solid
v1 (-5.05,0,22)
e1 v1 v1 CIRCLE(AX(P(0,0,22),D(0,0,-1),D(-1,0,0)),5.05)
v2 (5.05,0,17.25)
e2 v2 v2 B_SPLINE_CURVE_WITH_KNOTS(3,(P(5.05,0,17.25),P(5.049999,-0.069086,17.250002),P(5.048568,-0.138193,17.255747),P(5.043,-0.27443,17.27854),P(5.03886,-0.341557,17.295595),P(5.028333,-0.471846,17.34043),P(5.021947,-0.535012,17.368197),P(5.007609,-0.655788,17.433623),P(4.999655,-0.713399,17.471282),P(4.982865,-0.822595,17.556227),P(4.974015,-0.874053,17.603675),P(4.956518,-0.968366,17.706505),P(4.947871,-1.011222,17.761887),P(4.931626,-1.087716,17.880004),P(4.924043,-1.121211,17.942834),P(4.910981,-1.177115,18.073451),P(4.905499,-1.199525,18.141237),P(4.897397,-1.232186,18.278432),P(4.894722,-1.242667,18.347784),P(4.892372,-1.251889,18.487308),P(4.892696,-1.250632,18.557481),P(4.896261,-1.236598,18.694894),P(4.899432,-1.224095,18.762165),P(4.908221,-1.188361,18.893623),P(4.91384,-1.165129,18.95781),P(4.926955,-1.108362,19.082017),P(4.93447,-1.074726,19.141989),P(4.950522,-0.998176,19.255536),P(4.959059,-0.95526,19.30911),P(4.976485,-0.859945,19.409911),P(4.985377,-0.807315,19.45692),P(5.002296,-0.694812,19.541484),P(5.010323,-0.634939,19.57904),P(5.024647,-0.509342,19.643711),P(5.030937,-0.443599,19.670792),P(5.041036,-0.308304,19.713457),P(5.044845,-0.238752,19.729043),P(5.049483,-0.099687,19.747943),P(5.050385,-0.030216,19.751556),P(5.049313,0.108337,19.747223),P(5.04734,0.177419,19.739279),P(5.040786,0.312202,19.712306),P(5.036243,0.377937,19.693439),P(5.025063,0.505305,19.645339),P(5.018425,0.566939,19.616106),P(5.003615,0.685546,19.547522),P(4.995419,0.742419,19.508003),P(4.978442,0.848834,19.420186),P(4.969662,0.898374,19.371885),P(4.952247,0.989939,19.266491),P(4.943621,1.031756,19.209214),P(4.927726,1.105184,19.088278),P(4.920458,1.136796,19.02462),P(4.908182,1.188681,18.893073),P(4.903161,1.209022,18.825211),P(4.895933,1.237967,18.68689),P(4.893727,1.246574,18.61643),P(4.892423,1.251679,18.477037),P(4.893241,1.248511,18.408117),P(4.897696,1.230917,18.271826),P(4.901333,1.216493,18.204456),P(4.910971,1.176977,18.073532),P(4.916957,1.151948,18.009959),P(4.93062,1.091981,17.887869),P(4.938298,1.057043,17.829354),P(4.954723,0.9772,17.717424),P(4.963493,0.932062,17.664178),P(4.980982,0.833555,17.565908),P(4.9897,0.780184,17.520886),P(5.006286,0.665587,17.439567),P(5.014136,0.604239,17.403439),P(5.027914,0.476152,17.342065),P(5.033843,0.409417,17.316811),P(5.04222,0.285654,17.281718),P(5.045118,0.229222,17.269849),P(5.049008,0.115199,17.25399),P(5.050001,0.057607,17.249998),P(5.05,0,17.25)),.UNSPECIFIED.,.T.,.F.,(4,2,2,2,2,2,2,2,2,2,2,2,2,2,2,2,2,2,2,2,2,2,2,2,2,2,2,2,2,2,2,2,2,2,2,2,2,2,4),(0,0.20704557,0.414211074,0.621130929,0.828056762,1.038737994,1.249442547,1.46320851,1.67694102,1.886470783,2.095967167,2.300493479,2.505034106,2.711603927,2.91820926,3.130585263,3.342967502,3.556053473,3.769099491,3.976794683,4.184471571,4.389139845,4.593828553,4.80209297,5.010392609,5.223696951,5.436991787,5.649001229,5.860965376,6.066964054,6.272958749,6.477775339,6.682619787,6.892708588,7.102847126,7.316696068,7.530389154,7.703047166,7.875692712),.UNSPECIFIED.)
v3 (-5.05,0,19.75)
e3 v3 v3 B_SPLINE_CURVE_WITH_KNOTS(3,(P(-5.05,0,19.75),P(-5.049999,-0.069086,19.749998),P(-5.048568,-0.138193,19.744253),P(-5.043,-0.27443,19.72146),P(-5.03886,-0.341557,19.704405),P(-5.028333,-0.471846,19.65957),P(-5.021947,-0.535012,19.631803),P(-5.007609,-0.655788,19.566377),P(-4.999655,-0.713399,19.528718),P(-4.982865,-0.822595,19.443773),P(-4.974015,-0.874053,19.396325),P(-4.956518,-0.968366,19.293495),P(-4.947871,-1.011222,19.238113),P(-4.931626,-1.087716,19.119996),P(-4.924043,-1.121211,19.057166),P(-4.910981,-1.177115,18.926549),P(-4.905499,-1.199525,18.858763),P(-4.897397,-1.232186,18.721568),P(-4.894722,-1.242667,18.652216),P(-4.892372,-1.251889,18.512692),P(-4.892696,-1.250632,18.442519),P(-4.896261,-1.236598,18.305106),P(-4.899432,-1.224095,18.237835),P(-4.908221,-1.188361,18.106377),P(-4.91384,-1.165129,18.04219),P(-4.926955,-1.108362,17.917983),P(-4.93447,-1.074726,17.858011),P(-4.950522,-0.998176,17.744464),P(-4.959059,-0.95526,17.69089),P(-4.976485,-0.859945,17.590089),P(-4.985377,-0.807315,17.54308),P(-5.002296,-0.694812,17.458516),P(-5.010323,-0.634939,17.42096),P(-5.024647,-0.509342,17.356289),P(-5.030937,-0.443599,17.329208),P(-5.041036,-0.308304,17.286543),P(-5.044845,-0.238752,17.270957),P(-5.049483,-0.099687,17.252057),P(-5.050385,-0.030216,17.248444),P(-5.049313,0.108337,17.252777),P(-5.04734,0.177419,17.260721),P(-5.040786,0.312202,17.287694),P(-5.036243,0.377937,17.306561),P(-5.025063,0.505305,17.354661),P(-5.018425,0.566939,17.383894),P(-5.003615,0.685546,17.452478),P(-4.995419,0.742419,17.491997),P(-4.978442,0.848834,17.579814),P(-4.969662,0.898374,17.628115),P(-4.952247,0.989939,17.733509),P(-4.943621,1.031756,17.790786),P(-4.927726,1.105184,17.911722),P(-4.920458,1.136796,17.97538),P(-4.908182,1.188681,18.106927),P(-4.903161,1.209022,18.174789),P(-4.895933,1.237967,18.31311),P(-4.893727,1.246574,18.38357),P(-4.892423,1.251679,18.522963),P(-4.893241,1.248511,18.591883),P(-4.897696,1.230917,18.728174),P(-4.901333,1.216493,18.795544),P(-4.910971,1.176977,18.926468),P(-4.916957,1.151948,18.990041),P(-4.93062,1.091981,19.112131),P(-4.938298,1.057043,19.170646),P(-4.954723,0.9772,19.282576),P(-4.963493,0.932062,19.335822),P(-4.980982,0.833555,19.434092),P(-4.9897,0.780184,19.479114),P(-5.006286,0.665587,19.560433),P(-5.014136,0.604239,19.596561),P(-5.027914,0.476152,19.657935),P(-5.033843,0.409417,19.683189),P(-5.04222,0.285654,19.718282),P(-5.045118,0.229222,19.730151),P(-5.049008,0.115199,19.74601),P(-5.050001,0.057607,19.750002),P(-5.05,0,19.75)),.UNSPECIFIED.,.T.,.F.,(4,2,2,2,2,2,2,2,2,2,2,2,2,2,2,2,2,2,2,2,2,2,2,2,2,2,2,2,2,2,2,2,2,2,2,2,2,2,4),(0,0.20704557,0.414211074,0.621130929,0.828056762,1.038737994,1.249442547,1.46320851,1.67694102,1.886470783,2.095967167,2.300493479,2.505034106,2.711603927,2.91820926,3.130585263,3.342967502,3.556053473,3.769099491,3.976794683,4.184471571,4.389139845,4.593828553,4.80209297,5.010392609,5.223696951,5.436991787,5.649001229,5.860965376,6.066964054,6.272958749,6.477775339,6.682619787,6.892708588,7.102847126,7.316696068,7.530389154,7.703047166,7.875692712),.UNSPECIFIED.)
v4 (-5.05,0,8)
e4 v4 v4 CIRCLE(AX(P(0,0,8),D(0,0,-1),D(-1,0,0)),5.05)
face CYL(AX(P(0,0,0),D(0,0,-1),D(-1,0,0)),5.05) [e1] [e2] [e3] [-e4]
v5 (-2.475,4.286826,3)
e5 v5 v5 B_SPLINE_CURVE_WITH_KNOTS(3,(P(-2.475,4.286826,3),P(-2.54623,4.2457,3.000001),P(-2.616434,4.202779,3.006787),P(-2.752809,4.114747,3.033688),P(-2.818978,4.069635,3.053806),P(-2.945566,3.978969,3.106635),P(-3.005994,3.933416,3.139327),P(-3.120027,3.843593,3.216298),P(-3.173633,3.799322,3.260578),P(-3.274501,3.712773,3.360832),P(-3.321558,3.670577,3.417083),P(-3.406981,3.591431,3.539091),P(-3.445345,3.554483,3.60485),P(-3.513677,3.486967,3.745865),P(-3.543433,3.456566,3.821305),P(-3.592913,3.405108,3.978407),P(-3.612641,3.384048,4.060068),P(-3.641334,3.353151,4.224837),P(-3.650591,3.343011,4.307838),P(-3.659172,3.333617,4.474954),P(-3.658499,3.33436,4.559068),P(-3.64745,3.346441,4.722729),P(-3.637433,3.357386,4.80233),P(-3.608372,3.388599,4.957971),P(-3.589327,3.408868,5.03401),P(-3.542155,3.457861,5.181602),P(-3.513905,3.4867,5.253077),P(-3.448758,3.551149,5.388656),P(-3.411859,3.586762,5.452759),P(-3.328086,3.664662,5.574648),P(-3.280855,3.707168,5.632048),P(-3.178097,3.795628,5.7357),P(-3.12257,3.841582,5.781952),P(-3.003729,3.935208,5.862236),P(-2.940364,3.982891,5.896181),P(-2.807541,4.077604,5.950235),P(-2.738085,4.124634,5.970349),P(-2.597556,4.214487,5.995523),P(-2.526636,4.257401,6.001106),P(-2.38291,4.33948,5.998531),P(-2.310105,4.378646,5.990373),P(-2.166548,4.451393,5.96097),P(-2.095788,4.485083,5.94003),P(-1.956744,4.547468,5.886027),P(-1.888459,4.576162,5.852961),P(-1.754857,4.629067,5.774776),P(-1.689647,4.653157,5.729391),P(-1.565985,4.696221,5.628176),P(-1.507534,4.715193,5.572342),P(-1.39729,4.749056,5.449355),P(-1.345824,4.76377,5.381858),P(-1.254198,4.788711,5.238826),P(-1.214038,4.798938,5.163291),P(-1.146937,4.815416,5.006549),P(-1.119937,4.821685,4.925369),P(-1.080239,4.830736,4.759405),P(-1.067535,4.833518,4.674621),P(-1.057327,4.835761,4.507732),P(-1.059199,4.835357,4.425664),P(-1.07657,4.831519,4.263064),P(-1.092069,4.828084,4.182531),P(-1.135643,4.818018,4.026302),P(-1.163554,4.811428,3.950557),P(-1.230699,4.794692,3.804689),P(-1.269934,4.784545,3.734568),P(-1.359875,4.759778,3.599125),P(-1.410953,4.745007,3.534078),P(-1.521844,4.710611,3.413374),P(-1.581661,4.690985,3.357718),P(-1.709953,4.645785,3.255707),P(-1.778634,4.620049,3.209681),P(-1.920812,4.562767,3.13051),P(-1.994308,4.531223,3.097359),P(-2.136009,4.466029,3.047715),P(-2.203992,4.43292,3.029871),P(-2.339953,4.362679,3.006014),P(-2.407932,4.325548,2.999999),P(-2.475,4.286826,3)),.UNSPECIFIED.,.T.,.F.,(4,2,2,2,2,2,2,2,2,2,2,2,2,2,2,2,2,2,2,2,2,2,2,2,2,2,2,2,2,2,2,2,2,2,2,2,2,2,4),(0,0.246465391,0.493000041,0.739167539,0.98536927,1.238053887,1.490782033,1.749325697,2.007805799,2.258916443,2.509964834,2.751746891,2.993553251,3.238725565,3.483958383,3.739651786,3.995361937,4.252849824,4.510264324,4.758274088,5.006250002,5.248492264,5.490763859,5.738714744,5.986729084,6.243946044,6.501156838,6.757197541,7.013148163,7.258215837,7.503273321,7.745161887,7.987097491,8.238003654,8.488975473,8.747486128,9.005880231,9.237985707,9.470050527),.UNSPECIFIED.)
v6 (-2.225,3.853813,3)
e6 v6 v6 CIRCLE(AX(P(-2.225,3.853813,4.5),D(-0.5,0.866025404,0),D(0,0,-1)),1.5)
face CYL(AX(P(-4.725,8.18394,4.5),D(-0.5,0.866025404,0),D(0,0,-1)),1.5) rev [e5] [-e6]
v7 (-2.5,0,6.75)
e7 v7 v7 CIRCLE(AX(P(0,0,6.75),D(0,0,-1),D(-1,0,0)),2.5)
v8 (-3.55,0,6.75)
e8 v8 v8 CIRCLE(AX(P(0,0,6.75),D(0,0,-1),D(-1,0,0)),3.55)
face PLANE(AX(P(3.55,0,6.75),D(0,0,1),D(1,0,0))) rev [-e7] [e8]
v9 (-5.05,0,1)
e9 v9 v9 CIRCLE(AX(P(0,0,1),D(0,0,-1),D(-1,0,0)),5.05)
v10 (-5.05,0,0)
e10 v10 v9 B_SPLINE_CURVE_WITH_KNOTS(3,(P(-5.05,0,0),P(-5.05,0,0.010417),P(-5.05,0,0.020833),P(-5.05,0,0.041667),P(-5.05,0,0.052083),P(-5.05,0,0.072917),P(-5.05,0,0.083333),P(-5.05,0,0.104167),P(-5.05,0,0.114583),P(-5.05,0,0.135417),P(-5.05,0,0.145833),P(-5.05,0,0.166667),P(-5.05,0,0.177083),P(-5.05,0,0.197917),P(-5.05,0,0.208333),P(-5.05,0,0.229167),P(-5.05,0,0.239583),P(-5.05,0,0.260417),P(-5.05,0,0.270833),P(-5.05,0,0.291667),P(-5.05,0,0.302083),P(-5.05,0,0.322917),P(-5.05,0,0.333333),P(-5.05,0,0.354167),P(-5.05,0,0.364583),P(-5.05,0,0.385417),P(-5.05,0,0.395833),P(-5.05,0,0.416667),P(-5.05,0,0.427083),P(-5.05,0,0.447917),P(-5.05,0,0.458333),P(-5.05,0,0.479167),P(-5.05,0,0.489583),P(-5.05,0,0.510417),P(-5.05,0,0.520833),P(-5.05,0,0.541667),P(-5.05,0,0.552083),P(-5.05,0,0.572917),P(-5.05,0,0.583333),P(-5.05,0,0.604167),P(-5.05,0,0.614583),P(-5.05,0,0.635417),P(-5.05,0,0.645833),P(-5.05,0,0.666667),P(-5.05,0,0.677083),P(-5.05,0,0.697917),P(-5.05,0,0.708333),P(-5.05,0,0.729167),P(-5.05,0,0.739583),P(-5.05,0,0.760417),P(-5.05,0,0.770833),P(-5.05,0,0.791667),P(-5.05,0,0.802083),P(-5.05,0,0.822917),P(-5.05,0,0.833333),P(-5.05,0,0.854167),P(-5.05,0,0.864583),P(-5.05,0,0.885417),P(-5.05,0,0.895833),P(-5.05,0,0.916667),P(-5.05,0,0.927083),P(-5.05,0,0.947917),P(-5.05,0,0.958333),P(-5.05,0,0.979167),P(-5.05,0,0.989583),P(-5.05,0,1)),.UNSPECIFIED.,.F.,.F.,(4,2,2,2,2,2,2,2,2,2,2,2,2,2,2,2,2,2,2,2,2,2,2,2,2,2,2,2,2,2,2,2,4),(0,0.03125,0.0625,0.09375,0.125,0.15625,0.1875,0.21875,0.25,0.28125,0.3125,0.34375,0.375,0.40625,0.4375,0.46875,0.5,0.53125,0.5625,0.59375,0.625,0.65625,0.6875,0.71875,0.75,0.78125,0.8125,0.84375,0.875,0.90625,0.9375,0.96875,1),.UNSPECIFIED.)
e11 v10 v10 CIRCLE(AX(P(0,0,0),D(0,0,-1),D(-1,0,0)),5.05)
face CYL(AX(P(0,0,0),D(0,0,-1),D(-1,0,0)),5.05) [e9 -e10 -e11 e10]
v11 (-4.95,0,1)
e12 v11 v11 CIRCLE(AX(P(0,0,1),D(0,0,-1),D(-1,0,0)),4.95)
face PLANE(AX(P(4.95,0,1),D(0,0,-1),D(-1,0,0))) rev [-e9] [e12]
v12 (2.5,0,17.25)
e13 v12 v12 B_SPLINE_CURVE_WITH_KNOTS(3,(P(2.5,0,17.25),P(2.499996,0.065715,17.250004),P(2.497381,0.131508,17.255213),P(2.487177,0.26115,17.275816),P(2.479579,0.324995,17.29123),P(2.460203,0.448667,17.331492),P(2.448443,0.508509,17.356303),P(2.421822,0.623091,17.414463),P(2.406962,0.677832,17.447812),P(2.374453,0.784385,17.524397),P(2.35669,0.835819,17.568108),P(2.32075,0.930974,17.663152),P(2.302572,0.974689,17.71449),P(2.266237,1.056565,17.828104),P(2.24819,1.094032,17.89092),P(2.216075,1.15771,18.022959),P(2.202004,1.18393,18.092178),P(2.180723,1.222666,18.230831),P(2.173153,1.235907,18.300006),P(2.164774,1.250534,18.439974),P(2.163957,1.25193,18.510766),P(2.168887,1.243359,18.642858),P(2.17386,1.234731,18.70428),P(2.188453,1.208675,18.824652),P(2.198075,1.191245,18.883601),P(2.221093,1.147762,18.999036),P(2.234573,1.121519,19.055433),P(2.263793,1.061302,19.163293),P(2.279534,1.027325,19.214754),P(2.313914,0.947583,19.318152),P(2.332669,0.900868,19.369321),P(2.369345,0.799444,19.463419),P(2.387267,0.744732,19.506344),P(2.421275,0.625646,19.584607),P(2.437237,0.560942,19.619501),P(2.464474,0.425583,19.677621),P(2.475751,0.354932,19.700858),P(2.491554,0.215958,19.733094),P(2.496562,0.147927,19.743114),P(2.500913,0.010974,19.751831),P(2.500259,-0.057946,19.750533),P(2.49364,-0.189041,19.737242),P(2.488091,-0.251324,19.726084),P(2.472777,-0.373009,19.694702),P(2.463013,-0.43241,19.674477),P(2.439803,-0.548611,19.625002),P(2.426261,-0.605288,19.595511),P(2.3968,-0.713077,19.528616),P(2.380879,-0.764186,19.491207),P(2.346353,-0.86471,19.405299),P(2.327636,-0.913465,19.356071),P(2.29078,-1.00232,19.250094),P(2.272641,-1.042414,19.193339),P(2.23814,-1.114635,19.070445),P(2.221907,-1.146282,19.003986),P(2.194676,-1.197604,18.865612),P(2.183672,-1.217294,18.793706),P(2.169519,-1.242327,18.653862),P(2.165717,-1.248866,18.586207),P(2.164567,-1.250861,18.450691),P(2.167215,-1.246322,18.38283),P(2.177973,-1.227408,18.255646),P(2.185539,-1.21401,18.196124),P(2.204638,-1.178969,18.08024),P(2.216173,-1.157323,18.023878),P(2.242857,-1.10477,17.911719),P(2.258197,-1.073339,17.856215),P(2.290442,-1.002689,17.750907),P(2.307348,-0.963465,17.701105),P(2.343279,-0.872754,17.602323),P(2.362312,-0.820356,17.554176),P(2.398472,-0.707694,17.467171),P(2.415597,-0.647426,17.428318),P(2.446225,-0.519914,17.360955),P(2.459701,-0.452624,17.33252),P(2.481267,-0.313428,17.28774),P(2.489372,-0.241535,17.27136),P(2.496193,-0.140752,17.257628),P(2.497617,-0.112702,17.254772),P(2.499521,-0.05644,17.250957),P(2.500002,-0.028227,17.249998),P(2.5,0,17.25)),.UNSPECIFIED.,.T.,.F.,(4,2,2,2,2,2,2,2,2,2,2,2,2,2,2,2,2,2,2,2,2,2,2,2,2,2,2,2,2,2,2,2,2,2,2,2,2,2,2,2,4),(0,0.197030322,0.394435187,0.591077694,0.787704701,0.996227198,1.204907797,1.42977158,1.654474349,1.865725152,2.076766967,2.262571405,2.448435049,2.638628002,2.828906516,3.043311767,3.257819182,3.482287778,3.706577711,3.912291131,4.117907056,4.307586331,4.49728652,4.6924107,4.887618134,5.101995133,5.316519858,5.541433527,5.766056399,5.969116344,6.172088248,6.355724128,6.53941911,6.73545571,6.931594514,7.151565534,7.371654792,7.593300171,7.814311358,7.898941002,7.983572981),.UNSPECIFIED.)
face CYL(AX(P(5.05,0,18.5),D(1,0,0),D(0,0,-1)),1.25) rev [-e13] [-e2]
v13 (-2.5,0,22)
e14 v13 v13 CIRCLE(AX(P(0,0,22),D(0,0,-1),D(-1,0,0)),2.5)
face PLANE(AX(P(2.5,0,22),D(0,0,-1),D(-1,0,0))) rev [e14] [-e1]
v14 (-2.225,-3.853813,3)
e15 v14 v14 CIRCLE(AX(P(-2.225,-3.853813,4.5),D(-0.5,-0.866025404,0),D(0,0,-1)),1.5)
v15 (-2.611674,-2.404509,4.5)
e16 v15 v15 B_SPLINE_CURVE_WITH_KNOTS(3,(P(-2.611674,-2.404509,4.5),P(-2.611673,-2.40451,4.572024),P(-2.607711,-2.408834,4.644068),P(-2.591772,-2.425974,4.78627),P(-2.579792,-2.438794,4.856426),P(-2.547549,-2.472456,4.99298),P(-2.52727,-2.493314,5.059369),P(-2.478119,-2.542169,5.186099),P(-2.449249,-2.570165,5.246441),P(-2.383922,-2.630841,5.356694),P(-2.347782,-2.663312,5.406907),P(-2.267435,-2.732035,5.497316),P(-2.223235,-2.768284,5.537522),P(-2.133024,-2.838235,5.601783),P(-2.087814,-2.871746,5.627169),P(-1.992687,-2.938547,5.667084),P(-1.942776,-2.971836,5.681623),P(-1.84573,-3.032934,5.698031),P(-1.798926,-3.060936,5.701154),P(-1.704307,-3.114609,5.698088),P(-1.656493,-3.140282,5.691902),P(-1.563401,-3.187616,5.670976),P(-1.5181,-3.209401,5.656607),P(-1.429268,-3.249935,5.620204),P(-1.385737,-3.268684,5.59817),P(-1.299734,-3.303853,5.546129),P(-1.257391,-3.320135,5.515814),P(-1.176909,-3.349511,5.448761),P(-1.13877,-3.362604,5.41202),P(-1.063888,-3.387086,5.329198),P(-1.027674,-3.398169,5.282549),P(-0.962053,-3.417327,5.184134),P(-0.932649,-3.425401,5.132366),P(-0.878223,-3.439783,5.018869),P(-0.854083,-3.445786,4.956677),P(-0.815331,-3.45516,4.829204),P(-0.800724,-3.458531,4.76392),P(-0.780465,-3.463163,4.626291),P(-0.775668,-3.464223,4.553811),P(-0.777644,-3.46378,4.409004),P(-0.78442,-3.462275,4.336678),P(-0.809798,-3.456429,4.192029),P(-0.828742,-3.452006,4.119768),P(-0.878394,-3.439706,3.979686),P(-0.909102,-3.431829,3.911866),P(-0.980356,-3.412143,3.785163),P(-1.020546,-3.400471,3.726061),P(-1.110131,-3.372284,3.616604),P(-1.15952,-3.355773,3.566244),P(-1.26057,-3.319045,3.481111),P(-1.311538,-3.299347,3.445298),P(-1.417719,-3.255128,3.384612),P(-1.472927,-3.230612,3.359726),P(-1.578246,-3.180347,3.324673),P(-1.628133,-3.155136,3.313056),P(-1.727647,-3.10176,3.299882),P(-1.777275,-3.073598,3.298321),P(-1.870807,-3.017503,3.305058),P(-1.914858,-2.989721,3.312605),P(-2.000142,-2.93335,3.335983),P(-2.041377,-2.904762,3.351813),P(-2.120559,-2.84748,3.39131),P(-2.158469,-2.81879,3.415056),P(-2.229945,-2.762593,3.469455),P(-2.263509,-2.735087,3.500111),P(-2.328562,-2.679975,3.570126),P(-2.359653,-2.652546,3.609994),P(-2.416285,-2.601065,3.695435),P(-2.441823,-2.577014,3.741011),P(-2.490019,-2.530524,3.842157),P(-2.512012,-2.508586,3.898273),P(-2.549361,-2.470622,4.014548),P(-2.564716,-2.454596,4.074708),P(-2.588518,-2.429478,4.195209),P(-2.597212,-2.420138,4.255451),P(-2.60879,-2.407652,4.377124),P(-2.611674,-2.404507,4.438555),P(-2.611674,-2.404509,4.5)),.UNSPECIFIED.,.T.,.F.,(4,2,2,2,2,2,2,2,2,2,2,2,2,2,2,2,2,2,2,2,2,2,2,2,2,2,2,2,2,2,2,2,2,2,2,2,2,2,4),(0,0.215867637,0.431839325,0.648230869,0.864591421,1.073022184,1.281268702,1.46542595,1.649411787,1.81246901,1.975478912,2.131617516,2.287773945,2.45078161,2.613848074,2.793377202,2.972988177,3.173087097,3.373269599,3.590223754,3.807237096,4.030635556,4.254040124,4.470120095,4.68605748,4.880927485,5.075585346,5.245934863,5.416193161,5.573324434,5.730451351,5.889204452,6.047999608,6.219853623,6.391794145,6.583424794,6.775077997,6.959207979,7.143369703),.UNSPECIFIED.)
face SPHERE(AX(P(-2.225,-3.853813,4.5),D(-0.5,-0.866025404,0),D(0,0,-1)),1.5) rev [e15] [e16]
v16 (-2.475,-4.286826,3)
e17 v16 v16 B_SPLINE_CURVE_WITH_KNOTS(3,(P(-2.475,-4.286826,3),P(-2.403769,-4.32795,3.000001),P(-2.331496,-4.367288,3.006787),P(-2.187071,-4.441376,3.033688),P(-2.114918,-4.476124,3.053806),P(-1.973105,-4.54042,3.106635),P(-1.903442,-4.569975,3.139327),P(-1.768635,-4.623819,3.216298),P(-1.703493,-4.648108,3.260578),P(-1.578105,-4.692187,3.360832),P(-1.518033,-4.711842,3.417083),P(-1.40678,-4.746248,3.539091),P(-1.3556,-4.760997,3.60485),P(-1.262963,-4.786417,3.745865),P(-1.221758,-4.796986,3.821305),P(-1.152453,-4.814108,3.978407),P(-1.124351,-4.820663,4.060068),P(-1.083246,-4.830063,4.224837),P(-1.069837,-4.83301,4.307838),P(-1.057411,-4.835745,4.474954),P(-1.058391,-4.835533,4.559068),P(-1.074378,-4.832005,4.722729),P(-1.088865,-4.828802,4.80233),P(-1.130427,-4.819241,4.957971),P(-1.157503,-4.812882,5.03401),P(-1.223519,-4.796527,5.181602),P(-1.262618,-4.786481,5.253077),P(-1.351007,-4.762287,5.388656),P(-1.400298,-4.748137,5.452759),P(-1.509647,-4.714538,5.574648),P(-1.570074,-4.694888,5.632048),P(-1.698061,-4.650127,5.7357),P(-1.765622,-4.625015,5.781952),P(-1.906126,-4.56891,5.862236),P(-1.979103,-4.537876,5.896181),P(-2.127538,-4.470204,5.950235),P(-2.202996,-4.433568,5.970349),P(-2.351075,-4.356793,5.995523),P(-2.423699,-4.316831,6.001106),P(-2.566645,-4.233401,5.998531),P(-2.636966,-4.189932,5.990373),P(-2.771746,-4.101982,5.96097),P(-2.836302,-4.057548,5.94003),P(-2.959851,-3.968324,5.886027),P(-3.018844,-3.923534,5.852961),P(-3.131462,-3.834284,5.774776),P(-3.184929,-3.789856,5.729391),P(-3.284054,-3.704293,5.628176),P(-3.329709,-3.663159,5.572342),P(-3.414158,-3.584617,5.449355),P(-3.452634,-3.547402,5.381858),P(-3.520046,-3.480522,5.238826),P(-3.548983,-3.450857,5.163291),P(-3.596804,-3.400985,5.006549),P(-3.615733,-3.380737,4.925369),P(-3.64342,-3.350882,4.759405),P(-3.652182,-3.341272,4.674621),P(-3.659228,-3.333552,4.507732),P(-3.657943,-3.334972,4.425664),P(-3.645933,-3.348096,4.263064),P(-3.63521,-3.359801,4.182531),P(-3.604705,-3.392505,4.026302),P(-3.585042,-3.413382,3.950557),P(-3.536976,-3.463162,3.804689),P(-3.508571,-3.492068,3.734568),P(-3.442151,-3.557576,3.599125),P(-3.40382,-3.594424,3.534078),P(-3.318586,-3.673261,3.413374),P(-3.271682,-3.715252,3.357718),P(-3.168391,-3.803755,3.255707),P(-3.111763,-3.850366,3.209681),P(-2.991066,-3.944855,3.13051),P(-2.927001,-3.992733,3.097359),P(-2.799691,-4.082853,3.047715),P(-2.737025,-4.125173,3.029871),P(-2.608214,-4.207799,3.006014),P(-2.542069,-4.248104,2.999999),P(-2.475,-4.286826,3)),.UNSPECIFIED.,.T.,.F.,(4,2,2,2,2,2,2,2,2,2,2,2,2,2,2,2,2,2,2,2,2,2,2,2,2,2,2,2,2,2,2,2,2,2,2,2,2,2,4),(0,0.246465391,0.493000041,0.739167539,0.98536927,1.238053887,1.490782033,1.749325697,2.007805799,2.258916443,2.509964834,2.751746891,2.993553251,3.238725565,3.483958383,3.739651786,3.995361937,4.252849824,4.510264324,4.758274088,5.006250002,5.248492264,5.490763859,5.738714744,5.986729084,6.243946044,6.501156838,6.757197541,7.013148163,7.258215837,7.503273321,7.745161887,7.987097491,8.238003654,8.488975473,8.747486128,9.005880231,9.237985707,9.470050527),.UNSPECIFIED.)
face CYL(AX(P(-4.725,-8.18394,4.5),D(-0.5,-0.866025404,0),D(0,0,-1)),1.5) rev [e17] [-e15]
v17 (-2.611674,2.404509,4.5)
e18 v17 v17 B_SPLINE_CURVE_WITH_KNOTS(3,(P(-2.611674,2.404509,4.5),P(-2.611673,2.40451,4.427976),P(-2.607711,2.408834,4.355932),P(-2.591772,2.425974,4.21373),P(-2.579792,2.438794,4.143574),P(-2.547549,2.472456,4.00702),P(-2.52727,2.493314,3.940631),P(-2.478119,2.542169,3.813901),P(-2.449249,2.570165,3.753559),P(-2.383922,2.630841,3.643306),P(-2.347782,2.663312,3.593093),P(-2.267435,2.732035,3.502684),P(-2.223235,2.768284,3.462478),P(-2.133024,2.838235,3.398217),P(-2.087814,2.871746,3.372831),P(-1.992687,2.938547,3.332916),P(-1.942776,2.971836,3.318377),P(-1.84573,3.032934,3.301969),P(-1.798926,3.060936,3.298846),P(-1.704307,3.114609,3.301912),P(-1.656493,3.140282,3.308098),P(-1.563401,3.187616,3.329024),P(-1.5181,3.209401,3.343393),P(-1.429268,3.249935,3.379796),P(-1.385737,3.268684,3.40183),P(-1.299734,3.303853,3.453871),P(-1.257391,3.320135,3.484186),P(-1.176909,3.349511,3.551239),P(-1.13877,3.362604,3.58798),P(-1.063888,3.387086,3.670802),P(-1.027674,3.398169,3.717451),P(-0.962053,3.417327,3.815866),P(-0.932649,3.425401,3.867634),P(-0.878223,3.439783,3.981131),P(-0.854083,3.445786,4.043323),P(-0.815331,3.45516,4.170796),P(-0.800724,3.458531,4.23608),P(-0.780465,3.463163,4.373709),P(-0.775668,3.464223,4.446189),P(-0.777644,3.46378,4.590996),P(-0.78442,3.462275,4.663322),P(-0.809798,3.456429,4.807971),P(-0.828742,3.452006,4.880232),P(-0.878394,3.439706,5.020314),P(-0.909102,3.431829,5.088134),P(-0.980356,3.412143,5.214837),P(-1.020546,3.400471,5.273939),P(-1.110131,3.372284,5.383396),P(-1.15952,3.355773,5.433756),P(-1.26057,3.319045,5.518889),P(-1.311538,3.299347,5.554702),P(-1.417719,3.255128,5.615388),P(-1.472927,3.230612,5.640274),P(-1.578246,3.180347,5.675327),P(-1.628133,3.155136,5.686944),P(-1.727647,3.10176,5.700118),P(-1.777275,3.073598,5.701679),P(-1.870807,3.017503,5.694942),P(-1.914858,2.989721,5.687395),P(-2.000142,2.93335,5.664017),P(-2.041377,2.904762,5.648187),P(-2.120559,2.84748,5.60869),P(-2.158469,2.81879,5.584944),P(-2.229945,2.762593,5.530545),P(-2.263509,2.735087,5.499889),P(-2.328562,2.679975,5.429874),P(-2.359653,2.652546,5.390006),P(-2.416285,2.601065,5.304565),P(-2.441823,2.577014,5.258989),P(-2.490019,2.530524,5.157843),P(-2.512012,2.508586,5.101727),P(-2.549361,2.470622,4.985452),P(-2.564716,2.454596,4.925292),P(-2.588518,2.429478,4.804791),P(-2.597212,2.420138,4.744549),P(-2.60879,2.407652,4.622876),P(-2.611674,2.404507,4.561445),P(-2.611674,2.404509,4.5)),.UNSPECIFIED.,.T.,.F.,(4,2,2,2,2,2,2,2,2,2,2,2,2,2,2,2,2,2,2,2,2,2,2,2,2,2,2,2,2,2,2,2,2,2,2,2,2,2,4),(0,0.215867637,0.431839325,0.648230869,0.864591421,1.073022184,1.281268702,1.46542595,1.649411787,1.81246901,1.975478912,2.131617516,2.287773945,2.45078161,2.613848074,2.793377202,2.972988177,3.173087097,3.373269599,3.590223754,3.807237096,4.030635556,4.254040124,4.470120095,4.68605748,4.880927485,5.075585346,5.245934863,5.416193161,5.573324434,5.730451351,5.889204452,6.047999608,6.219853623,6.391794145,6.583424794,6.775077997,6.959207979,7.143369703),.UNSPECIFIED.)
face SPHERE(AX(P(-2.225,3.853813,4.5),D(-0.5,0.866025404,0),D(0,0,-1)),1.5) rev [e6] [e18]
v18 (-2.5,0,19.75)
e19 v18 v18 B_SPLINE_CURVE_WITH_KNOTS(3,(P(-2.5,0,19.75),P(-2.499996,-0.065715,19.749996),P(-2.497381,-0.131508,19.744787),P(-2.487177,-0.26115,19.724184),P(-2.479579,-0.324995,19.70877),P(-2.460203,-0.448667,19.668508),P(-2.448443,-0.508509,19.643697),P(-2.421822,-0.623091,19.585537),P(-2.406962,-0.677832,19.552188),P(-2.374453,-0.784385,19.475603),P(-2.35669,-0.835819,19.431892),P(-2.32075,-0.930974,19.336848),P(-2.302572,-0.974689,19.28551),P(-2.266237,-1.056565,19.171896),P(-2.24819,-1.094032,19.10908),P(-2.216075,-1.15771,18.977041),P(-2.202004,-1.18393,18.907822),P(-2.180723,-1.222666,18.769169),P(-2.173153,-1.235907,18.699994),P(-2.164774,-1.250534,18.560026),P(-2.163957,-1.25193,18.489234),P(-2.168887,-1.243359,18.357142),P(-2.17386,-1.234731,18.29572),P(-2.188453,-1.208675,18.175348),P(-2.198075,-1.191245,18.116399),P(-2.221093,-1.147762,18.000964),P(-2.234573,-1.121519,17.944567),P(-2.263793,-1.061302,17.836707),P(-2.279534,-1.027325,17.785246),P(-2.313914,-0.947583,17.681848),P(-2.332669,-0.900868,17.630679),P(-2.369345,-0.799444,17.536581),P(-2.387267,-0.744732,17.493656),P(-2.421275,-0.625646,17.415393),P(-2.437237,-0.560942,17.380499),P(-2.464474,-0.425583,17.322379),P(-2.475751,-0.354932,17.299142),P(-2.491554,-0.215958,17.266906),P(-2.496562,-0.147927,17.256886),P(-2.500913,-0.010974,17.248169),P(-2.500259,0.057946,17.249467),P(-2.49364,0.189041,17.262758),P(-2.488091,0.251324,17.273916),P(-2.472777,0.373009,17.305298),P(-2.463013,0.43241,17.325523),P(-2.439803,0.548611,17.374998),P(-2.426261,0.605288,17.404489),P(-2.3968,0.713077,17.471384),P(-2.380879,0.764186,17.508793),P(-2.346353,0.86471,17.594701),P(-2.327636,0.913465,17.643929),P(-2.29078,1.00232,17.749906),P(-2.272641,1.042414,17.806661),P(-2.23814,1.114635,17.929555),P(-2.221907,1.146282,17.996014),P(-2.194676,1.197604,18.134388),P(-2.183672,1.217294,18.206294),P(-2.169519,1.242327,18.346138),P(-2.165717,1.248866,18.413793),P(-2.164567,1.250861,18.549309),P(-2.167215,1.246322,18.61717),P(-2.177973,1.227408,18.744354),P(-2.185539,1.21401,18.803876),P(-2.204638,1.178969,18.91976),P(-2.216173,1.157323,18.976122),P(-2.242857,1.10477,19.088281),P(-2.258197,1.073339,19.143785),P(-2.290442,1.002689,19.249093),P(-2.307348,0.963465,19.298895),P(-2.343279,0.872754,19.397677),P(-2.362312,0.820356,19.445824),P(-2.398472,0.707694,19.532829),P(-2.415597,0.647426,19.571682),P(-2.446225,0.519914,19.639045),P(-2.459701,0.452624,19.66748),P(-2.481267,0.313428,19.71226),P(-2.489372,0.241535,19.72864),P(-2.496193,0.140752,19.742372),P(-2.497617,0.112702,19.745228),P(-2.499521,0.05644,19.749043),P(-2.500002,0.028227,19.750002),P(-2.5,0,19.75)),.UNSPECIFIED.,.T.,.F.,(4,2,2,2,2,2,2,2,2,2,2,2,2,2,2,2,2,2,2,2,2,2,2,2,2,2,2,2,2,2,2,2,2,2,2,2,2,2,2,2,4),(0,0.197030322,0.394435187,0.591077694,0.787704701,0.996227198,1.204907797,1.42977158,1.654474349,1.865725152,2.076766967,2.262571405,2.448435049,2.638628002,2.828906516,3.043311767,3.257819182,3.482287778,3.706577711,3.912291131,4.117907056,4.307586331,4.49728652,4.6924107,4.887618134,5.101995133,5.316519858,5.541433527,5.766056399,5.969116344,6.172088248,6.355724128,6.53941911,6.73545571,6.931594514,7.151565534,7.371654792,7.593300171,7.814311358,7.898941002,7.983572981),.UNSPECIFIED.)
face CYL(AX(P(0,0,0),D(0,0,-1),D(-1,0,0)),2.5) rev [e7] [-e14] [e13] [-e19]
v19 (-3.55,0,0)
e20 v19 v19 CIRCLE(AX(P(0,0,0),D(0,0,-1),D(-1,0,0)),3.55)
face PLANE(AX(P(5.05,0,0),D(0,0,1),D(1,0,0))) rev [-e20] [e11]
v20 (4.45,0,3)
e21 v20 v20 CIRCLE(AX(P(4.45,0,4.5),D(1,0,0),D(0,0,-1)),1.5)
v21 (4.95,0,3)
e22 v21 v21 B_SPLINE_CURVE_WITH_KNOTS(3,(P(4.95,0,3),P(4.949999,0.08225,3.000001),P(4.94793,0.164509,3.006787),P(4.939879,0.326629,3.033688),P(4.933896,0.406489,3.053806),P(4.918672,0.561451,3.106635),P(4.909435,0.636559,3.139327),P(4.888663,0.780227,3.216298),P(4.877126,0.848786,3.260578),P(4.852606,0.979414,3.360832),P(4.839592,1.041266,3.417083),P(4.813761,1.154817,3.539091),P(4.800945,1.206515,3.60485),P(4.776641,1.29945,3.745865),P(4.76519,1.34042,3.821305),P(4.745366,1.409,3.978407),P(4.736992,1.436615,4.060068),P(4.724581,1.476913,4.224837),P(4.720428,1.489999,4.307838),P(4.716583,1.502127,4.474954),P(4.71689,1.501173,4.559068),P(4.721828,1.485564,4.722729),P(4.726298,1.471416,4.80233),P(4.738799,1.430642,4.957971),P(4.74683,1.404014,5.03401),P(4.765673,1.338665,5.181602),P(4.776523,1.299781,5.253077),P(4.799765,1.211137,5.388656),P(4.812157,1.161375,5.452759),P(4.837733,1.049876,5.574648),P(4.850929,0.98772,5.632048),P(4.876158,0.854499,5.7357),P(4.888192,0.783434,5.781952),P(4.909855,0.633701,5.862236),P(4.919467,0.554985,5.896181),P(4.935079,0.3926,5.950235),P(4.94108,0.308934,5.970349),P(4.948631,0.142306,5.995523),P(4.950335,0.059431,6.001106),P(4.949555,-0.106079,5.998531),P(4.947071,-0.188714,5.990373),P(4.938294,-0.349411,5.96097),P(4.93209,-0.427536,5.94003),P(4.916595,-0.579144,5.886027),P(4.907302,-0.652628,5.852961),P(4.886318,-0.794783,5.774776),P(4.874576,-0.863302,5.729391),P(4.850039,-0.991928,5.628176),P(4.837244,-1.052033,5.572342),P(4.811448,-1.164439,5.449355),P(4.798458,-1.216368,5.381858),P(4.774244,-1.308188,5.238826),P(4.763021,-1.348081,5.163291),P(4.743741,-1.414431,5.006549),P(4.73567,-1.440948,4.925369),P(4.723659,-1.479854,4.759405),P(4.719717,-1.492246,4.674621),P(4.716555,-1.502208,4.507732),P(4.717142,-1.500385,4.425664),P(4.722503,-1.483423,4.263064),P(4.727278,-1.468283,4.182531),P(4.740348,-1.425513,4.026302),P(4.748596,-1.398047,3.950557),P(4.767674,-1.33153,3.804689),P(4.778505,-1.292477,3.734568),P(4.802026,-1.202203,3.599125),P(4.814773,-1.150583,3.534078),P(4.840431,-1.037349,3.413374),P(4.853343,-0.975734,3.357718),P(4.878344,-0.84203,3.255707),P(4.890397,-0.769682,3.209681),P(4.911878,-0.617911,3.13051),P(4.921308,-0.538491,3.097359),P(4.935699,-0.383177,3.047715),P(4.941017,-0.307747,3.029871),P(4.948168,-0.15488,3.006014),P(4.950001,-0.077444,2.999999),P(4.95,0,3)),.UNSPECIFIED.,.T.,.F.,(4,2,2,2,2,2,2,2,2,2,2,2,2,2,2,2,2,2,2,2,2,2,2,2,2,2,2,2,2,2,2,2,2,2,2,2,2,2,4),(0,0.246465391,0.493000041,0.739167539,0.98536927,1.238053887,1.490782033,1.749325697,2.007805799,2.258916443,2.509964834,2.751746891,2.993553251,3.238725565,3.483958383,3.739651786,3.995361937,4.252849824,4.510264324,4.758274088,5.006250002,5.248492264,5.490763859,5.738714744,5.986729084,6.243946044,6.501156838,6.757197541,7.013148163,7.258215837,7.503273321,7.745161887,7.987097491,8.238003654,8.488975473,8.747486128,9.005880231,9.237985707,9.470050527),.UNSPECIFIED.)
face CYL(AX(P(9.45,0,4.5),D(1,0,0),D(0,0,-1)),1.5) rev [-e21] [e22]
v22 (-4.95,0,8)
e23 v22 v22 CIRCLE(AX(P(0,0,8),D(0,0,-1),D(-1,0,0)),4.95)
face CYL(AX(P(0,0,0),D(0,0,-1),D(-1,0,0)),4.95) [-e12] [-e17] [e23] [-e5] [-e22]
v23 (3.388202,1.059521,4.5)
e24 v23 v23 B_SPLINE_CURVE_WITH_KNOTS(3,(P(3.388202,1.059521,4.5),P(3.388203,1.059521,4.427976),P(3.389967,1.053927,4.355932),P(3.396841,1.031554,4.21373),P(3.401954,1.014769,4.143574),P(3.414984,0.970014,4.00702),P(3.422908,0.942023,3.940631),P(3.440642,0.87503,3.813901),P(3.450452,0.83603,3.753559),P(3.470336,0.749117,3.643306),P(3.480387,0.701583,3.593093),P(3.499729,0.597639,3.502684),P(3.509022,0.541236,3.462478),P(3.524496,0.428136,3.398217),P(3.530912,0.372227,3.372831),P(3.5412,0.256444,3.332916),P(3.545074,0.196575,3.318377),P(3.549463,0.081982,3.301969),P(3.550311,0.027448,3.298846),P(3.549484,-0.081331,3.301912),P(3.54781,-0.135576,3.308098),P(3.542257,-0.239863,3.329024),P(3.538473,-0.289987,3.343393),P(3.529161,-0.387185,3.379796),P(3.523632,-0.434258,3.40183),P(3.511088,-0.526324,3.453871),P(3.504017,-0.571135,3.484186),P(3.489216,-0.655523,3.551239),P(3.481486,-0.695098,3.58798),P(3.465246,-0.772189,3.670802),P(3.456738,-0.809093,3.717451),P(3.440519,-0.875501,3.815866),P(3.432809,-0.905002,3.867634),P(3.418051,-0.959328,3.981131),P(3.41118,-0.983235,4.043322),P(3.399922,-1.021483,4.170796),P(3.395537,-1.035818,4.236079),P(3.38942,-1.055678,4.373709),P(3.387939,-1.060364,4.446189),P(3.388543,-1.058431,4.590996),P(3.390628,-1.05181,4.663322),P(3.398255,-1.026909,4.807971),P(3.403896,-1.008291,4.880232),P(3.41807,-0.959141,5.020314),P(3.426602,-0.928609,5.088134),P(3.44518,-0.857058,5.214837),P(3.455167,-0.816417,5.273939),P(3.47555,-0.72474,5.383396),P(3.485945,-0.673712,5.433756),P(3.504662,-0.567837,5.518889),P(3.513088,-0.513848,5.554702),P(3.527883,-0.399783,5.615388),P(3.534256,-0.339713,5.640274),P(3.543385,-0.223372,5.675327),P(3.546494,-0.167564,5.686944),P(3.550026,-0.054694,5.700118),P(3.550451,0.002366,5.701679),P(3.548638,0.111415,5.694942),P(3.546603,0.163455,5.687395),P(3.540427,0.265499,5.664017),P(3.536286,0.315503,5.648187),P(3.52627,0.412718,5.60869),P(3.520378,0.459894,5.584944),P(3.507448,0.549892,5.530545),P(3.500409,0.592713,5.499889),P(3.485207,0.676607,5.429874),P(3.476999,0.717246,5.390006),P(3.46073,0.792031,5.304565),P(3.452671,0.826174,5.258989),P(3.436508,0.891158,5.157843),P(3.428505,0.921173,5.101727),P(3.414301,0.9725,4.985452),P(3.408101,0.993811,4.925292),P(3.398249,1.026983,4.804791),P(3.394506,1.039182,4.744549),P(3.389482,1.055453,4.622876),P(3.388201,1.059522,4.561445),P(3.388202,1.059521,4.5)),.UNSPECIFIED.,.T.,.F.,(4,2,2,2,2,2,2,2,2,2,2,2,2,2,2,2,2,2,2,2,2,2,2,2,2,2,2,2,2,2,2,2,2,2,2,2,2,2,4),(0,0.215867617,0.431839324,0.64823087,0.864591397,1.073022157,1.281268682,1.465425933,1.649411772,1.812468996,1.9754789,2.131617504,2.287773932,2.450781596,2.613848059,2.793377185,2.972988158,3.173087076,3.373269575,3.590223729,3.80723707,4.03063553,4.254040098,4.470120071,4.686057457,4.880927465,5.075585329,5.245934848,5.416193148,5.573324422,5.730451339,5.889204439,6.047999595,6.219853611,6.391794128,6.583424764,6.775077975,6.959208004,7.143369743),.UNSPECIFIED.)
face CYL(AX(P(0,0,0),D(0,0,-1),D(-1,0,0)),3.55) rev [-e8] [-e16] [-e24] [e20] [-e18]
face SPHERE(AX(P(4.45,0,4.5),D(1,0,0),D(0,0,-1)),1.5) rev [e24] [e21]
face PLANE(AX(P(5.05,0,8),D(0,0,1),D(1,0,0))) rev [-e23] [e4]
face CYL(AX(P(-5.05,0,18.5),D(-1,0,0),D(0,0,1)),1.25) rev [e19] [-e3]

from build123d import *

# Parameters (mm, degrees)
BALL_CUT_PATTERN_COUNT      = 3
M3X0_5_TAPPED_HOLE1_REACH   = 23.674
M3X0_5_TAPPED_HOLE1_BORE_R  = 1.25
SET_SCREW_PATTERN_OUTLINE_W = 1.25
SET_SCREW_PATTERN_OUTLINE_H = 2.885095828


# Read off the part's stored shape, not the designer's step: Set Screw Pattern
with BuildPart() as part:
    # Body Sketch → Body Revolve (revolve)
    with BuildSketch(Plane(origin=(-33.219700818, 0, -2.434260963), x_dir=(-1, 0, 0), z_dir=(0, 1, 0)), mode=Mode.PRIVATE) as body_revolve_sk:
        Polygon((-35.719700818, 24.434260963), (-38.269700818, 24.434260963), (-38.269700818, 10.434260963), (-38.169700818, 10.434260963), (-38.169700818, 3.434260963), (-38.269700818, 3.434260963), (-38.269700818, 2.434260963), (-36.769700818, 2.434260963), (-36.769700818, 9.184260963), (-35.719700818, 9.184260963), align=None)
    revolve(body_revolve_sk.sketch.rotate(Axis((0, 0, 0), (0, 0, 1)), 180), axis=Axis((0, 0, 0), (0, 0, 1)))

    # Ball Cut Out Sketch → Ball Cut Revolve (revolve, cut)
    with BuildSketch(Plane(origin=(0, 0, 0), x_dir=(1, 0, 0), z_dir=(0, 1, 0)), mode=Mode.PRIVATE) as ball_cut_revolve_sk:
        with BuildLine():
            Line((4.45, -6), (9.45, -6))
            Line((9.45, -6), (9.45, -4.5))
            Line((9.45, -4.5), (2.95, -4.5))
            ThreePointArc((2.95, -4.5), (3.389339828, -5.560660172), (4.45, -6))
        make_face()
    ball_cut_revolve = revolve(ball_cut_revolve_sk.sketch.rotate(Axis((9.45, 0, 4.5), (-1, 0, 0)), 180), axis=Axis((9.45, 0, 4.5), (-1, 0, 0)), mode=Mode.SUBTRACT)

    # Ball Cut Pattern: Ball Cut Revolve ×3 about axis
    ball_cut_pattern_axis = Axis((0, 0, 0), (0, 0, 1))
    for i in range(1, BALL_CUT_PATTERN_COUNT):
        add(ball_cut_revolve.rotate(ball_cut_pattern_axis, i * 360 / BALL_CUT_PATTERN_COUNT), mode=Mode.SUBTRACT)

    # M3x0.5 Tapped Hole1 bore (on position points) → M3x0.5 Tapped Hole1 (cut, up to next)
    with BuildSketch(Plane(origin=(5.05, 0, 18.5), x_dir=(0, 1, 0), z_dir=(1, 0, 0)), mode=Mode.PRIVATE) as m3x0_5_tapped_hole1_sk1:
        Circle(M3X0_5_TAPPED_HOLE1_BORE_R)
    m3x0_5_tapped_hole1_tool1 = extrude(m3x0_5_tapped_hole1_sk1.sketch, amount=-M3X0_5_TAPPED_HOLE1_REACH, mode=Mode.PRIVATE) & part.part
    add(m3x0_5_tapped_hole1_tool1.solids().sort_by_distance((5.05, 0, 18.5))[0], mode=Mode.SUBTRACT)

    # Set Screw Pattern outline → Set Screw Pattern (revolve, cut)
    with BuildSketch(Plane.YX.offset(-18.5)):
        with Locations((0.625, -3.607452342)):
            Rectangle(SET_SCREW_PATTERN_OUTLINE_W, SET_SCREW_PATTERN_OUTLINE_H)
    revolve(axis=Axis((0, 0, 18.5), (1, 0, 0)), mode=Mode.SUBTRACT)


solid = part.part
